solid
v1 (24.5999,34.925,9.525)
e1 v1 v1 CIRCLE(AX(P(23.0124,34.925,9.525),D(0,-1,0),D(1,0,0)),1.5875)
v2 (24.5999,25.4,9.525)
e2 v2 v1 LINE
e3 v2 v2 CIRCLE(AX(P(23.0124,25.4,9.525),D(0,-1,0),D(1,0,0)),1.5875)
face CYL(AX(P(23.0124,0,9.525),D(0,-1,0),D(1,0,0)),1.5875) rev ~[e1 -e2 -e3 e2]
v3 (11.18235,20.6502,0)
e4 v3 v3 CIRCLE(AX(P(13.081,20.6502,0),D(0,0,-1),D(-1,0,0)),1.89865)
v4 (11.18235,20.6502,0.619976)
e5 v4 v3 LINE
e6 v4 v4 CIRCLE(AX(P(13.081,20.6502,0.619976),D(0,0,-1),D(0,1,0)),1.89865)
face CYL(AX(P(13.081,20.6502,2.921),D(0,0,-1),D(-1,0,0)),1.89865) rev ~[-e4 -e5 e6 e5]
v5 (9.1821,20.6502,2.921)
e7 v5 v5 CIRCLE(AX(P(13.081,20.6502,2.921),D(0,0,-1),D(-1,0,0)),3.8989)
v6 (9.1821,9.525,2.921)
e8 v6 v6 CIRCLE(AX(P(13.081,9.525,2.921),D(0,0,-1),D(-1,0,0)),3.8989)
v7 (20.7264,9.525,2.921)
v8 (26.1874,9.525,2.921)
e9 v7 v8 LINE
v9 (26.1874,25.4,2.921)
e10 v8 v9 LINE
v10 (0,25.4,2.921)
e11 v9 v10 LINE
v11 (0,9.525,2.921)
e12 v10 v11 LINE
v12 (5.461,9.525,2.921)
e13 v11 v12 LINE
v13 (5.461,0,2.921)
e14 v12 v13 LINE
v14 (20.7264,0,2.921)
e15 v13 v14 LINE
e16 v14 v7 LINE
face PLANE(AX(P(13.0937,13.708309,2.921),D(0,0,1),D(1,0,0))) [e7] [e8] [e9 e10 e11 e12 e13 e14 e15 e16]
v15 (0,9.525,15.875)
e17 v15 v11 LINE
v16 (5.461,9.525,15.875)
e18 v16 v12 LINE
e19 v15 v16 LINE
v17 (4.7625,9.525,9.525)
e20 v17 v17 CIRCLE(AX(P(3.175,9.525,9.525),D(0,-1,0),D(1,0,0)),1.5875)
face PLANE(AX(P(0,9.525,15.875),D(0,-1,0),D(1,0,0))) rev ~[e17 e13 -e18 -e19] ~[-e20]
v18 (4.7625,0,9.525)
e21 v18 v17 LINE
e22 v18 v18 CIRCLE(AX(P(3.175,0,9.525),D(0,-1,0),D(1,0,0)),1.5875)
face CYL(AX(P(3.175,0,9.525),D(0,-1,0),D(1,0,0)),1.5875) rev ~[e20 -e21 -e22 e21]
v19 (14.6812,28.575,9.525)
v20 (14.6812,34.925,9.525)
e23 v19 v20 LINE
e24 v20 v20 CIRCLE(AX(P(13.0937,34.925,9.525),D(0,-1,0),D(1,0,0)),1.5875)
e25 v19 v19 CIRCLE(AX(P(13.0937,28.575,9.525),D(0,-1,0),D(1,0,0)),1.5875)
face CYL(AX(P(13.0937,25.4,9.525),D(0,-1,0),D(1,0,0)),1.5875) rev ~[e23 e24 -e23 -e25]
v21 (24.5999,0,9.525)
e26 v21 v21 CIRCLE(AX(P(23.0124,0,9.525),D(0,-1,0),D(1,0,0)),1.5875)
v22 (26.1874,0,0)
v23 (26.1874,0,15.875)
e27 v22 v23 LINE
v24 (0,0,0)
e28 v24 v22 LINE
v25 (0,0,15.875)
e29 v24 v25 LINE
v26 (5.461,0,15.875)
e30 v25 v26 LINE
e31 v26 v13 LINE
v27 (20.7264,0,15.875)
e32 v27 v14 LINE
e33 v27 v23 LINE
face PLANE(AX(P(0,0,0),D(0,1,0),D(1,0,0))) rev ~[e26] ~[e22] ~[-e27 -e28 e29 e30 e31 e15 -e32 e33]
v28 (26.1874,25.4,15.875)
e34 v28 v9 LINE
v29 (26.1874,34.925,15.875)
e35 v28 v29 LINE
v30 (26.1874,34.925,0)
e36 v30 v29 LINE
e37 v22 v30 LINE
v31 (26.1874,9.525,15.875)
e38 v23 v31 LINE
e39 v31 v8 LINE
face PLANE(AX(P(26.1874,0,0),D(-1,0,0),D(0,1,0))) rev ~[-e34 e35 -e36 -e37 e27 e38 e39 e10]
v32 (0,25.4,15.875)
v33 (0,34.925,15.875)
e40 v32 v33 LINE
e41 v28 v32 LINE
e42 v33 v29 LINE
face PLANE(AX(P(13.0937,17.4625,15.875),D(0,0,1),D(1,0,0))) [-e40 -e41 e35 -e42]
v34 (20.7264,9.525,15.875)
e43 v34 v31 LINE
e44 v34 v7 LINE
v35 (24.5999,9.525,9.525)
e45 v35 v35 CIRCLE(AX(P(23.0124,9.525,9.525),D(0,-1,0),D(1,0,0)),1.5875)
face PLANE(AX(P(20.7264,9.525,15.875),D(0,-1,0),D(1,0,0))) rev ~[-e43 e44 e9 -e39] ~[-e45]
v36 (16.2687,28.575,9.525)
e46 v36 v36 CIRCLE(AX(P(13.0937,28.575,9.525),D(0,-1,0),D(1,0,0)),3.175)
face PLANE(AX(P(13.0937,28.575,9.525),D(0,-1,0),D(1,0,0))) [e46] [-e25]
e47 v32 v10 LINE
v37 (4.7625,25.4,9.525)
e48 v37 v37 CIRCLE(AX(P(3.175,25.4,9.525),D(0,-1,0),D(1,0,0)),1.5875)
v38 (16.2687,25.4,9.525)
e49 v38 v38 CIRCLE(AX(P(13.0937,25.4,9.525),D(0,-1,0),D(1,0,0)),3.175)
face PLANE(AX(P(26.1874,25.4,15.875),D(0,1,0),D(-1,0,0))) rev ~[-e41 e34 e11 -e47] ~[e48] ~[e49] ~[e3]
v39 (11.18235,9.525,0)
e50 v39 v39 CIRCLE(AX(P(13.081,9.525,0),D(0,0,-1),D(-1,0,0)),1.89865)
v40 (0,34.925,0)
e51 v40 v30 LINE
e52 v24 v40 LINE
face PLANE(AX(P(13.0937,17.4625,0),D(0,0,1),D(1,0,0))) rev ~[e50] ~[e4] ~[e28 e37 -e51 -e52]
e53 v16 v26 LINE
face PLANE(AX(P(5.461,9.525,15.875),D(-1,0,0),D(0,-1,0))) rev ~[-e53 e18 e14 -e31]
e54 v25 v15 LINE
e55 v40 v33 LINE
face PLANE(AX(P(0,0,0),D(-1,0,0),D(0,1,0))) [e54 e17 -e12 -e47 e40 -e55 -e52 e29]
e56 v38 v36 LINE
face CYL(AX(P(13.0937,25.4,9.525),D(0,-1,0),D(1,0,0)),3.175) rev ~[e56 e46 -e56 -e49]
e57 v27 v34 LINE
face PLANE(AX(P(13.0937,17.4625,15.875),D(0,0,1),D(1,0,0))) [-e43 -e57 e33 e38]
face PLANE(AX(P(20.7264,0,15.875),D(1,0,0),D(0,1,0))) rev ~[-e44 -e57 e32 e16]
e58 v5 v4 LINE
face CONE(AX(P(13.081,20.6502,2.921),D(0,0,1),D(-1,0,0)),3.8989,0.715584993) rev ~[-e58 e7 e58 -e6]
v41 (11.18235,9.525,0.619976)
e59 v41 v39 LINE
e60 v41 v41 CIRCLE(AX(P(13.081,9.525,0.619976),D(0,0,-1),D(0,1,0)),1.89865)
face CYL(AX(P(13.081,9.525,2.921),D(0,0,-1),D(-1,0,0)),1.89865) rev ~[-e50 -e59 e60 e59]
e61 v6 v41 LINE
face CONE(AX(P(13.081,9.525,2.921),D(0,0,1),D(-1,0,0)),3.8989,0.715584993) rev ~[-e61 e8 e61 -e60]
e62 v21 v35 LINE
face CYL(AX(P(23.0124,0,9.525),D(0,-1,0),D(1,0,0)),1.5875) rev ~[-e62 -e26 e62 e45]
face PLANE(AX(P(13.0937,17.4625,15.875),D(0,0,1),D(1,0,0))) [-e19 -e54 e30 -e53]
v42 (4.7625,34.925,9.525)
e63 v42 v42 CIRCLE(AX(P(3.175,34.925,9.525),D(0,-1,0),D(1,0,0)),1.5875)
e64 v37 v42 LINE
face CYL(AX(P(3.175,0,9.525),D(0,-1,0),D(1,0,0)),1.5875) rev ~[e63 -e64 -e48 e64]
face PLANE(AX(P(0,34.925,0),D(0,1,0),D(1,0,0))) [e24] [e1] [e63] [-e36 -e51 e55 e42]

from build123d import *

# Parameters (mm, degrees)
F0_W           = 26.1874
F0_H           = 34.925
F1_DEPTH       = 15.875
F3_DEPTH       = 12.954
F4_R           = 1.5875
F5_DEPTH       = 34.926
F6_R           = 1.5875
F7_DEPTH       = 9.526
F9_D           = 3.7973
F9_CSINK_D     = 7.7978
F9_CSINK_ANGLE = 82
F10_R          = 3.175
F10_R_2        = 1.5875
F11_DEPTH      = 3.175


with BuildPart() as f1:
    # F0 (on Top) → F1 (new body)
    with BuildSketch(Plane.XY):
        with Locations((13.0937, 17.4625)):
            Rectangle(F0_W, F0_H)
    extrude(amount=F1_DEPTH)

    # F2 (on face) → F3 (cut)
    with BuildSketch(Plane.XY.offset(15.875)):
        Polygon((26.1874, 25.4), (0, 25.4), (0, 9.525), (5.461, 9.525), (5.461, 0), (20.7264, 0), (20.7264, 9.525), (26.1874, 9.525), align=None)
    extrude(amount=-F3_DEPTH, mode=Mode.SUBTRACT)

    # F4 (on face) → F5 (cut, through all)
    with BuildSketch(Plane.XZ):
        with Locations((3.175, 9.525)):
            Circle(F4_R)
        with Locations((23.0124, 9.525)):
            Circle(F4_R)
    extrude(amount=-F5_DEPTH, mode=Mode.SUBTRACT)

    # F6 (on face) → F7 (cut, through all)
    with BuildSketch(Plane.XZ.offset(-25.4)):
        with Locations((13.0937, 9.525)):
            Circle(F6_R)
    extrude(amount=-F7_DEPTH, mode=Mode.SUBTRACT)

    # F9 (through all)
    with Locations(Plane.XY.offset(2.921)):
        with Locations((13.081, 20.6502), (13.081, 9.525)):
            CounterSinkHole(F9_D / 2, F9_CSINK_D / 2, counter_sink_angle=F9_CSINK_ANGLE)

    # F10 (on face) → F11 (cut)
    with BuildSketch(Plane.XZ.offset(-25.4)):
        with Locations((13.0937, 9.525)):
            Circle(F10_R)
        with Locations((13.0937, 9.525)):
            Circle(F10_R_2, mode=Mode.SUBTRACT)
    extrude(amount=-F11_DEPTH, mode=Mode.SUBTRACT)


solid = f1.part
